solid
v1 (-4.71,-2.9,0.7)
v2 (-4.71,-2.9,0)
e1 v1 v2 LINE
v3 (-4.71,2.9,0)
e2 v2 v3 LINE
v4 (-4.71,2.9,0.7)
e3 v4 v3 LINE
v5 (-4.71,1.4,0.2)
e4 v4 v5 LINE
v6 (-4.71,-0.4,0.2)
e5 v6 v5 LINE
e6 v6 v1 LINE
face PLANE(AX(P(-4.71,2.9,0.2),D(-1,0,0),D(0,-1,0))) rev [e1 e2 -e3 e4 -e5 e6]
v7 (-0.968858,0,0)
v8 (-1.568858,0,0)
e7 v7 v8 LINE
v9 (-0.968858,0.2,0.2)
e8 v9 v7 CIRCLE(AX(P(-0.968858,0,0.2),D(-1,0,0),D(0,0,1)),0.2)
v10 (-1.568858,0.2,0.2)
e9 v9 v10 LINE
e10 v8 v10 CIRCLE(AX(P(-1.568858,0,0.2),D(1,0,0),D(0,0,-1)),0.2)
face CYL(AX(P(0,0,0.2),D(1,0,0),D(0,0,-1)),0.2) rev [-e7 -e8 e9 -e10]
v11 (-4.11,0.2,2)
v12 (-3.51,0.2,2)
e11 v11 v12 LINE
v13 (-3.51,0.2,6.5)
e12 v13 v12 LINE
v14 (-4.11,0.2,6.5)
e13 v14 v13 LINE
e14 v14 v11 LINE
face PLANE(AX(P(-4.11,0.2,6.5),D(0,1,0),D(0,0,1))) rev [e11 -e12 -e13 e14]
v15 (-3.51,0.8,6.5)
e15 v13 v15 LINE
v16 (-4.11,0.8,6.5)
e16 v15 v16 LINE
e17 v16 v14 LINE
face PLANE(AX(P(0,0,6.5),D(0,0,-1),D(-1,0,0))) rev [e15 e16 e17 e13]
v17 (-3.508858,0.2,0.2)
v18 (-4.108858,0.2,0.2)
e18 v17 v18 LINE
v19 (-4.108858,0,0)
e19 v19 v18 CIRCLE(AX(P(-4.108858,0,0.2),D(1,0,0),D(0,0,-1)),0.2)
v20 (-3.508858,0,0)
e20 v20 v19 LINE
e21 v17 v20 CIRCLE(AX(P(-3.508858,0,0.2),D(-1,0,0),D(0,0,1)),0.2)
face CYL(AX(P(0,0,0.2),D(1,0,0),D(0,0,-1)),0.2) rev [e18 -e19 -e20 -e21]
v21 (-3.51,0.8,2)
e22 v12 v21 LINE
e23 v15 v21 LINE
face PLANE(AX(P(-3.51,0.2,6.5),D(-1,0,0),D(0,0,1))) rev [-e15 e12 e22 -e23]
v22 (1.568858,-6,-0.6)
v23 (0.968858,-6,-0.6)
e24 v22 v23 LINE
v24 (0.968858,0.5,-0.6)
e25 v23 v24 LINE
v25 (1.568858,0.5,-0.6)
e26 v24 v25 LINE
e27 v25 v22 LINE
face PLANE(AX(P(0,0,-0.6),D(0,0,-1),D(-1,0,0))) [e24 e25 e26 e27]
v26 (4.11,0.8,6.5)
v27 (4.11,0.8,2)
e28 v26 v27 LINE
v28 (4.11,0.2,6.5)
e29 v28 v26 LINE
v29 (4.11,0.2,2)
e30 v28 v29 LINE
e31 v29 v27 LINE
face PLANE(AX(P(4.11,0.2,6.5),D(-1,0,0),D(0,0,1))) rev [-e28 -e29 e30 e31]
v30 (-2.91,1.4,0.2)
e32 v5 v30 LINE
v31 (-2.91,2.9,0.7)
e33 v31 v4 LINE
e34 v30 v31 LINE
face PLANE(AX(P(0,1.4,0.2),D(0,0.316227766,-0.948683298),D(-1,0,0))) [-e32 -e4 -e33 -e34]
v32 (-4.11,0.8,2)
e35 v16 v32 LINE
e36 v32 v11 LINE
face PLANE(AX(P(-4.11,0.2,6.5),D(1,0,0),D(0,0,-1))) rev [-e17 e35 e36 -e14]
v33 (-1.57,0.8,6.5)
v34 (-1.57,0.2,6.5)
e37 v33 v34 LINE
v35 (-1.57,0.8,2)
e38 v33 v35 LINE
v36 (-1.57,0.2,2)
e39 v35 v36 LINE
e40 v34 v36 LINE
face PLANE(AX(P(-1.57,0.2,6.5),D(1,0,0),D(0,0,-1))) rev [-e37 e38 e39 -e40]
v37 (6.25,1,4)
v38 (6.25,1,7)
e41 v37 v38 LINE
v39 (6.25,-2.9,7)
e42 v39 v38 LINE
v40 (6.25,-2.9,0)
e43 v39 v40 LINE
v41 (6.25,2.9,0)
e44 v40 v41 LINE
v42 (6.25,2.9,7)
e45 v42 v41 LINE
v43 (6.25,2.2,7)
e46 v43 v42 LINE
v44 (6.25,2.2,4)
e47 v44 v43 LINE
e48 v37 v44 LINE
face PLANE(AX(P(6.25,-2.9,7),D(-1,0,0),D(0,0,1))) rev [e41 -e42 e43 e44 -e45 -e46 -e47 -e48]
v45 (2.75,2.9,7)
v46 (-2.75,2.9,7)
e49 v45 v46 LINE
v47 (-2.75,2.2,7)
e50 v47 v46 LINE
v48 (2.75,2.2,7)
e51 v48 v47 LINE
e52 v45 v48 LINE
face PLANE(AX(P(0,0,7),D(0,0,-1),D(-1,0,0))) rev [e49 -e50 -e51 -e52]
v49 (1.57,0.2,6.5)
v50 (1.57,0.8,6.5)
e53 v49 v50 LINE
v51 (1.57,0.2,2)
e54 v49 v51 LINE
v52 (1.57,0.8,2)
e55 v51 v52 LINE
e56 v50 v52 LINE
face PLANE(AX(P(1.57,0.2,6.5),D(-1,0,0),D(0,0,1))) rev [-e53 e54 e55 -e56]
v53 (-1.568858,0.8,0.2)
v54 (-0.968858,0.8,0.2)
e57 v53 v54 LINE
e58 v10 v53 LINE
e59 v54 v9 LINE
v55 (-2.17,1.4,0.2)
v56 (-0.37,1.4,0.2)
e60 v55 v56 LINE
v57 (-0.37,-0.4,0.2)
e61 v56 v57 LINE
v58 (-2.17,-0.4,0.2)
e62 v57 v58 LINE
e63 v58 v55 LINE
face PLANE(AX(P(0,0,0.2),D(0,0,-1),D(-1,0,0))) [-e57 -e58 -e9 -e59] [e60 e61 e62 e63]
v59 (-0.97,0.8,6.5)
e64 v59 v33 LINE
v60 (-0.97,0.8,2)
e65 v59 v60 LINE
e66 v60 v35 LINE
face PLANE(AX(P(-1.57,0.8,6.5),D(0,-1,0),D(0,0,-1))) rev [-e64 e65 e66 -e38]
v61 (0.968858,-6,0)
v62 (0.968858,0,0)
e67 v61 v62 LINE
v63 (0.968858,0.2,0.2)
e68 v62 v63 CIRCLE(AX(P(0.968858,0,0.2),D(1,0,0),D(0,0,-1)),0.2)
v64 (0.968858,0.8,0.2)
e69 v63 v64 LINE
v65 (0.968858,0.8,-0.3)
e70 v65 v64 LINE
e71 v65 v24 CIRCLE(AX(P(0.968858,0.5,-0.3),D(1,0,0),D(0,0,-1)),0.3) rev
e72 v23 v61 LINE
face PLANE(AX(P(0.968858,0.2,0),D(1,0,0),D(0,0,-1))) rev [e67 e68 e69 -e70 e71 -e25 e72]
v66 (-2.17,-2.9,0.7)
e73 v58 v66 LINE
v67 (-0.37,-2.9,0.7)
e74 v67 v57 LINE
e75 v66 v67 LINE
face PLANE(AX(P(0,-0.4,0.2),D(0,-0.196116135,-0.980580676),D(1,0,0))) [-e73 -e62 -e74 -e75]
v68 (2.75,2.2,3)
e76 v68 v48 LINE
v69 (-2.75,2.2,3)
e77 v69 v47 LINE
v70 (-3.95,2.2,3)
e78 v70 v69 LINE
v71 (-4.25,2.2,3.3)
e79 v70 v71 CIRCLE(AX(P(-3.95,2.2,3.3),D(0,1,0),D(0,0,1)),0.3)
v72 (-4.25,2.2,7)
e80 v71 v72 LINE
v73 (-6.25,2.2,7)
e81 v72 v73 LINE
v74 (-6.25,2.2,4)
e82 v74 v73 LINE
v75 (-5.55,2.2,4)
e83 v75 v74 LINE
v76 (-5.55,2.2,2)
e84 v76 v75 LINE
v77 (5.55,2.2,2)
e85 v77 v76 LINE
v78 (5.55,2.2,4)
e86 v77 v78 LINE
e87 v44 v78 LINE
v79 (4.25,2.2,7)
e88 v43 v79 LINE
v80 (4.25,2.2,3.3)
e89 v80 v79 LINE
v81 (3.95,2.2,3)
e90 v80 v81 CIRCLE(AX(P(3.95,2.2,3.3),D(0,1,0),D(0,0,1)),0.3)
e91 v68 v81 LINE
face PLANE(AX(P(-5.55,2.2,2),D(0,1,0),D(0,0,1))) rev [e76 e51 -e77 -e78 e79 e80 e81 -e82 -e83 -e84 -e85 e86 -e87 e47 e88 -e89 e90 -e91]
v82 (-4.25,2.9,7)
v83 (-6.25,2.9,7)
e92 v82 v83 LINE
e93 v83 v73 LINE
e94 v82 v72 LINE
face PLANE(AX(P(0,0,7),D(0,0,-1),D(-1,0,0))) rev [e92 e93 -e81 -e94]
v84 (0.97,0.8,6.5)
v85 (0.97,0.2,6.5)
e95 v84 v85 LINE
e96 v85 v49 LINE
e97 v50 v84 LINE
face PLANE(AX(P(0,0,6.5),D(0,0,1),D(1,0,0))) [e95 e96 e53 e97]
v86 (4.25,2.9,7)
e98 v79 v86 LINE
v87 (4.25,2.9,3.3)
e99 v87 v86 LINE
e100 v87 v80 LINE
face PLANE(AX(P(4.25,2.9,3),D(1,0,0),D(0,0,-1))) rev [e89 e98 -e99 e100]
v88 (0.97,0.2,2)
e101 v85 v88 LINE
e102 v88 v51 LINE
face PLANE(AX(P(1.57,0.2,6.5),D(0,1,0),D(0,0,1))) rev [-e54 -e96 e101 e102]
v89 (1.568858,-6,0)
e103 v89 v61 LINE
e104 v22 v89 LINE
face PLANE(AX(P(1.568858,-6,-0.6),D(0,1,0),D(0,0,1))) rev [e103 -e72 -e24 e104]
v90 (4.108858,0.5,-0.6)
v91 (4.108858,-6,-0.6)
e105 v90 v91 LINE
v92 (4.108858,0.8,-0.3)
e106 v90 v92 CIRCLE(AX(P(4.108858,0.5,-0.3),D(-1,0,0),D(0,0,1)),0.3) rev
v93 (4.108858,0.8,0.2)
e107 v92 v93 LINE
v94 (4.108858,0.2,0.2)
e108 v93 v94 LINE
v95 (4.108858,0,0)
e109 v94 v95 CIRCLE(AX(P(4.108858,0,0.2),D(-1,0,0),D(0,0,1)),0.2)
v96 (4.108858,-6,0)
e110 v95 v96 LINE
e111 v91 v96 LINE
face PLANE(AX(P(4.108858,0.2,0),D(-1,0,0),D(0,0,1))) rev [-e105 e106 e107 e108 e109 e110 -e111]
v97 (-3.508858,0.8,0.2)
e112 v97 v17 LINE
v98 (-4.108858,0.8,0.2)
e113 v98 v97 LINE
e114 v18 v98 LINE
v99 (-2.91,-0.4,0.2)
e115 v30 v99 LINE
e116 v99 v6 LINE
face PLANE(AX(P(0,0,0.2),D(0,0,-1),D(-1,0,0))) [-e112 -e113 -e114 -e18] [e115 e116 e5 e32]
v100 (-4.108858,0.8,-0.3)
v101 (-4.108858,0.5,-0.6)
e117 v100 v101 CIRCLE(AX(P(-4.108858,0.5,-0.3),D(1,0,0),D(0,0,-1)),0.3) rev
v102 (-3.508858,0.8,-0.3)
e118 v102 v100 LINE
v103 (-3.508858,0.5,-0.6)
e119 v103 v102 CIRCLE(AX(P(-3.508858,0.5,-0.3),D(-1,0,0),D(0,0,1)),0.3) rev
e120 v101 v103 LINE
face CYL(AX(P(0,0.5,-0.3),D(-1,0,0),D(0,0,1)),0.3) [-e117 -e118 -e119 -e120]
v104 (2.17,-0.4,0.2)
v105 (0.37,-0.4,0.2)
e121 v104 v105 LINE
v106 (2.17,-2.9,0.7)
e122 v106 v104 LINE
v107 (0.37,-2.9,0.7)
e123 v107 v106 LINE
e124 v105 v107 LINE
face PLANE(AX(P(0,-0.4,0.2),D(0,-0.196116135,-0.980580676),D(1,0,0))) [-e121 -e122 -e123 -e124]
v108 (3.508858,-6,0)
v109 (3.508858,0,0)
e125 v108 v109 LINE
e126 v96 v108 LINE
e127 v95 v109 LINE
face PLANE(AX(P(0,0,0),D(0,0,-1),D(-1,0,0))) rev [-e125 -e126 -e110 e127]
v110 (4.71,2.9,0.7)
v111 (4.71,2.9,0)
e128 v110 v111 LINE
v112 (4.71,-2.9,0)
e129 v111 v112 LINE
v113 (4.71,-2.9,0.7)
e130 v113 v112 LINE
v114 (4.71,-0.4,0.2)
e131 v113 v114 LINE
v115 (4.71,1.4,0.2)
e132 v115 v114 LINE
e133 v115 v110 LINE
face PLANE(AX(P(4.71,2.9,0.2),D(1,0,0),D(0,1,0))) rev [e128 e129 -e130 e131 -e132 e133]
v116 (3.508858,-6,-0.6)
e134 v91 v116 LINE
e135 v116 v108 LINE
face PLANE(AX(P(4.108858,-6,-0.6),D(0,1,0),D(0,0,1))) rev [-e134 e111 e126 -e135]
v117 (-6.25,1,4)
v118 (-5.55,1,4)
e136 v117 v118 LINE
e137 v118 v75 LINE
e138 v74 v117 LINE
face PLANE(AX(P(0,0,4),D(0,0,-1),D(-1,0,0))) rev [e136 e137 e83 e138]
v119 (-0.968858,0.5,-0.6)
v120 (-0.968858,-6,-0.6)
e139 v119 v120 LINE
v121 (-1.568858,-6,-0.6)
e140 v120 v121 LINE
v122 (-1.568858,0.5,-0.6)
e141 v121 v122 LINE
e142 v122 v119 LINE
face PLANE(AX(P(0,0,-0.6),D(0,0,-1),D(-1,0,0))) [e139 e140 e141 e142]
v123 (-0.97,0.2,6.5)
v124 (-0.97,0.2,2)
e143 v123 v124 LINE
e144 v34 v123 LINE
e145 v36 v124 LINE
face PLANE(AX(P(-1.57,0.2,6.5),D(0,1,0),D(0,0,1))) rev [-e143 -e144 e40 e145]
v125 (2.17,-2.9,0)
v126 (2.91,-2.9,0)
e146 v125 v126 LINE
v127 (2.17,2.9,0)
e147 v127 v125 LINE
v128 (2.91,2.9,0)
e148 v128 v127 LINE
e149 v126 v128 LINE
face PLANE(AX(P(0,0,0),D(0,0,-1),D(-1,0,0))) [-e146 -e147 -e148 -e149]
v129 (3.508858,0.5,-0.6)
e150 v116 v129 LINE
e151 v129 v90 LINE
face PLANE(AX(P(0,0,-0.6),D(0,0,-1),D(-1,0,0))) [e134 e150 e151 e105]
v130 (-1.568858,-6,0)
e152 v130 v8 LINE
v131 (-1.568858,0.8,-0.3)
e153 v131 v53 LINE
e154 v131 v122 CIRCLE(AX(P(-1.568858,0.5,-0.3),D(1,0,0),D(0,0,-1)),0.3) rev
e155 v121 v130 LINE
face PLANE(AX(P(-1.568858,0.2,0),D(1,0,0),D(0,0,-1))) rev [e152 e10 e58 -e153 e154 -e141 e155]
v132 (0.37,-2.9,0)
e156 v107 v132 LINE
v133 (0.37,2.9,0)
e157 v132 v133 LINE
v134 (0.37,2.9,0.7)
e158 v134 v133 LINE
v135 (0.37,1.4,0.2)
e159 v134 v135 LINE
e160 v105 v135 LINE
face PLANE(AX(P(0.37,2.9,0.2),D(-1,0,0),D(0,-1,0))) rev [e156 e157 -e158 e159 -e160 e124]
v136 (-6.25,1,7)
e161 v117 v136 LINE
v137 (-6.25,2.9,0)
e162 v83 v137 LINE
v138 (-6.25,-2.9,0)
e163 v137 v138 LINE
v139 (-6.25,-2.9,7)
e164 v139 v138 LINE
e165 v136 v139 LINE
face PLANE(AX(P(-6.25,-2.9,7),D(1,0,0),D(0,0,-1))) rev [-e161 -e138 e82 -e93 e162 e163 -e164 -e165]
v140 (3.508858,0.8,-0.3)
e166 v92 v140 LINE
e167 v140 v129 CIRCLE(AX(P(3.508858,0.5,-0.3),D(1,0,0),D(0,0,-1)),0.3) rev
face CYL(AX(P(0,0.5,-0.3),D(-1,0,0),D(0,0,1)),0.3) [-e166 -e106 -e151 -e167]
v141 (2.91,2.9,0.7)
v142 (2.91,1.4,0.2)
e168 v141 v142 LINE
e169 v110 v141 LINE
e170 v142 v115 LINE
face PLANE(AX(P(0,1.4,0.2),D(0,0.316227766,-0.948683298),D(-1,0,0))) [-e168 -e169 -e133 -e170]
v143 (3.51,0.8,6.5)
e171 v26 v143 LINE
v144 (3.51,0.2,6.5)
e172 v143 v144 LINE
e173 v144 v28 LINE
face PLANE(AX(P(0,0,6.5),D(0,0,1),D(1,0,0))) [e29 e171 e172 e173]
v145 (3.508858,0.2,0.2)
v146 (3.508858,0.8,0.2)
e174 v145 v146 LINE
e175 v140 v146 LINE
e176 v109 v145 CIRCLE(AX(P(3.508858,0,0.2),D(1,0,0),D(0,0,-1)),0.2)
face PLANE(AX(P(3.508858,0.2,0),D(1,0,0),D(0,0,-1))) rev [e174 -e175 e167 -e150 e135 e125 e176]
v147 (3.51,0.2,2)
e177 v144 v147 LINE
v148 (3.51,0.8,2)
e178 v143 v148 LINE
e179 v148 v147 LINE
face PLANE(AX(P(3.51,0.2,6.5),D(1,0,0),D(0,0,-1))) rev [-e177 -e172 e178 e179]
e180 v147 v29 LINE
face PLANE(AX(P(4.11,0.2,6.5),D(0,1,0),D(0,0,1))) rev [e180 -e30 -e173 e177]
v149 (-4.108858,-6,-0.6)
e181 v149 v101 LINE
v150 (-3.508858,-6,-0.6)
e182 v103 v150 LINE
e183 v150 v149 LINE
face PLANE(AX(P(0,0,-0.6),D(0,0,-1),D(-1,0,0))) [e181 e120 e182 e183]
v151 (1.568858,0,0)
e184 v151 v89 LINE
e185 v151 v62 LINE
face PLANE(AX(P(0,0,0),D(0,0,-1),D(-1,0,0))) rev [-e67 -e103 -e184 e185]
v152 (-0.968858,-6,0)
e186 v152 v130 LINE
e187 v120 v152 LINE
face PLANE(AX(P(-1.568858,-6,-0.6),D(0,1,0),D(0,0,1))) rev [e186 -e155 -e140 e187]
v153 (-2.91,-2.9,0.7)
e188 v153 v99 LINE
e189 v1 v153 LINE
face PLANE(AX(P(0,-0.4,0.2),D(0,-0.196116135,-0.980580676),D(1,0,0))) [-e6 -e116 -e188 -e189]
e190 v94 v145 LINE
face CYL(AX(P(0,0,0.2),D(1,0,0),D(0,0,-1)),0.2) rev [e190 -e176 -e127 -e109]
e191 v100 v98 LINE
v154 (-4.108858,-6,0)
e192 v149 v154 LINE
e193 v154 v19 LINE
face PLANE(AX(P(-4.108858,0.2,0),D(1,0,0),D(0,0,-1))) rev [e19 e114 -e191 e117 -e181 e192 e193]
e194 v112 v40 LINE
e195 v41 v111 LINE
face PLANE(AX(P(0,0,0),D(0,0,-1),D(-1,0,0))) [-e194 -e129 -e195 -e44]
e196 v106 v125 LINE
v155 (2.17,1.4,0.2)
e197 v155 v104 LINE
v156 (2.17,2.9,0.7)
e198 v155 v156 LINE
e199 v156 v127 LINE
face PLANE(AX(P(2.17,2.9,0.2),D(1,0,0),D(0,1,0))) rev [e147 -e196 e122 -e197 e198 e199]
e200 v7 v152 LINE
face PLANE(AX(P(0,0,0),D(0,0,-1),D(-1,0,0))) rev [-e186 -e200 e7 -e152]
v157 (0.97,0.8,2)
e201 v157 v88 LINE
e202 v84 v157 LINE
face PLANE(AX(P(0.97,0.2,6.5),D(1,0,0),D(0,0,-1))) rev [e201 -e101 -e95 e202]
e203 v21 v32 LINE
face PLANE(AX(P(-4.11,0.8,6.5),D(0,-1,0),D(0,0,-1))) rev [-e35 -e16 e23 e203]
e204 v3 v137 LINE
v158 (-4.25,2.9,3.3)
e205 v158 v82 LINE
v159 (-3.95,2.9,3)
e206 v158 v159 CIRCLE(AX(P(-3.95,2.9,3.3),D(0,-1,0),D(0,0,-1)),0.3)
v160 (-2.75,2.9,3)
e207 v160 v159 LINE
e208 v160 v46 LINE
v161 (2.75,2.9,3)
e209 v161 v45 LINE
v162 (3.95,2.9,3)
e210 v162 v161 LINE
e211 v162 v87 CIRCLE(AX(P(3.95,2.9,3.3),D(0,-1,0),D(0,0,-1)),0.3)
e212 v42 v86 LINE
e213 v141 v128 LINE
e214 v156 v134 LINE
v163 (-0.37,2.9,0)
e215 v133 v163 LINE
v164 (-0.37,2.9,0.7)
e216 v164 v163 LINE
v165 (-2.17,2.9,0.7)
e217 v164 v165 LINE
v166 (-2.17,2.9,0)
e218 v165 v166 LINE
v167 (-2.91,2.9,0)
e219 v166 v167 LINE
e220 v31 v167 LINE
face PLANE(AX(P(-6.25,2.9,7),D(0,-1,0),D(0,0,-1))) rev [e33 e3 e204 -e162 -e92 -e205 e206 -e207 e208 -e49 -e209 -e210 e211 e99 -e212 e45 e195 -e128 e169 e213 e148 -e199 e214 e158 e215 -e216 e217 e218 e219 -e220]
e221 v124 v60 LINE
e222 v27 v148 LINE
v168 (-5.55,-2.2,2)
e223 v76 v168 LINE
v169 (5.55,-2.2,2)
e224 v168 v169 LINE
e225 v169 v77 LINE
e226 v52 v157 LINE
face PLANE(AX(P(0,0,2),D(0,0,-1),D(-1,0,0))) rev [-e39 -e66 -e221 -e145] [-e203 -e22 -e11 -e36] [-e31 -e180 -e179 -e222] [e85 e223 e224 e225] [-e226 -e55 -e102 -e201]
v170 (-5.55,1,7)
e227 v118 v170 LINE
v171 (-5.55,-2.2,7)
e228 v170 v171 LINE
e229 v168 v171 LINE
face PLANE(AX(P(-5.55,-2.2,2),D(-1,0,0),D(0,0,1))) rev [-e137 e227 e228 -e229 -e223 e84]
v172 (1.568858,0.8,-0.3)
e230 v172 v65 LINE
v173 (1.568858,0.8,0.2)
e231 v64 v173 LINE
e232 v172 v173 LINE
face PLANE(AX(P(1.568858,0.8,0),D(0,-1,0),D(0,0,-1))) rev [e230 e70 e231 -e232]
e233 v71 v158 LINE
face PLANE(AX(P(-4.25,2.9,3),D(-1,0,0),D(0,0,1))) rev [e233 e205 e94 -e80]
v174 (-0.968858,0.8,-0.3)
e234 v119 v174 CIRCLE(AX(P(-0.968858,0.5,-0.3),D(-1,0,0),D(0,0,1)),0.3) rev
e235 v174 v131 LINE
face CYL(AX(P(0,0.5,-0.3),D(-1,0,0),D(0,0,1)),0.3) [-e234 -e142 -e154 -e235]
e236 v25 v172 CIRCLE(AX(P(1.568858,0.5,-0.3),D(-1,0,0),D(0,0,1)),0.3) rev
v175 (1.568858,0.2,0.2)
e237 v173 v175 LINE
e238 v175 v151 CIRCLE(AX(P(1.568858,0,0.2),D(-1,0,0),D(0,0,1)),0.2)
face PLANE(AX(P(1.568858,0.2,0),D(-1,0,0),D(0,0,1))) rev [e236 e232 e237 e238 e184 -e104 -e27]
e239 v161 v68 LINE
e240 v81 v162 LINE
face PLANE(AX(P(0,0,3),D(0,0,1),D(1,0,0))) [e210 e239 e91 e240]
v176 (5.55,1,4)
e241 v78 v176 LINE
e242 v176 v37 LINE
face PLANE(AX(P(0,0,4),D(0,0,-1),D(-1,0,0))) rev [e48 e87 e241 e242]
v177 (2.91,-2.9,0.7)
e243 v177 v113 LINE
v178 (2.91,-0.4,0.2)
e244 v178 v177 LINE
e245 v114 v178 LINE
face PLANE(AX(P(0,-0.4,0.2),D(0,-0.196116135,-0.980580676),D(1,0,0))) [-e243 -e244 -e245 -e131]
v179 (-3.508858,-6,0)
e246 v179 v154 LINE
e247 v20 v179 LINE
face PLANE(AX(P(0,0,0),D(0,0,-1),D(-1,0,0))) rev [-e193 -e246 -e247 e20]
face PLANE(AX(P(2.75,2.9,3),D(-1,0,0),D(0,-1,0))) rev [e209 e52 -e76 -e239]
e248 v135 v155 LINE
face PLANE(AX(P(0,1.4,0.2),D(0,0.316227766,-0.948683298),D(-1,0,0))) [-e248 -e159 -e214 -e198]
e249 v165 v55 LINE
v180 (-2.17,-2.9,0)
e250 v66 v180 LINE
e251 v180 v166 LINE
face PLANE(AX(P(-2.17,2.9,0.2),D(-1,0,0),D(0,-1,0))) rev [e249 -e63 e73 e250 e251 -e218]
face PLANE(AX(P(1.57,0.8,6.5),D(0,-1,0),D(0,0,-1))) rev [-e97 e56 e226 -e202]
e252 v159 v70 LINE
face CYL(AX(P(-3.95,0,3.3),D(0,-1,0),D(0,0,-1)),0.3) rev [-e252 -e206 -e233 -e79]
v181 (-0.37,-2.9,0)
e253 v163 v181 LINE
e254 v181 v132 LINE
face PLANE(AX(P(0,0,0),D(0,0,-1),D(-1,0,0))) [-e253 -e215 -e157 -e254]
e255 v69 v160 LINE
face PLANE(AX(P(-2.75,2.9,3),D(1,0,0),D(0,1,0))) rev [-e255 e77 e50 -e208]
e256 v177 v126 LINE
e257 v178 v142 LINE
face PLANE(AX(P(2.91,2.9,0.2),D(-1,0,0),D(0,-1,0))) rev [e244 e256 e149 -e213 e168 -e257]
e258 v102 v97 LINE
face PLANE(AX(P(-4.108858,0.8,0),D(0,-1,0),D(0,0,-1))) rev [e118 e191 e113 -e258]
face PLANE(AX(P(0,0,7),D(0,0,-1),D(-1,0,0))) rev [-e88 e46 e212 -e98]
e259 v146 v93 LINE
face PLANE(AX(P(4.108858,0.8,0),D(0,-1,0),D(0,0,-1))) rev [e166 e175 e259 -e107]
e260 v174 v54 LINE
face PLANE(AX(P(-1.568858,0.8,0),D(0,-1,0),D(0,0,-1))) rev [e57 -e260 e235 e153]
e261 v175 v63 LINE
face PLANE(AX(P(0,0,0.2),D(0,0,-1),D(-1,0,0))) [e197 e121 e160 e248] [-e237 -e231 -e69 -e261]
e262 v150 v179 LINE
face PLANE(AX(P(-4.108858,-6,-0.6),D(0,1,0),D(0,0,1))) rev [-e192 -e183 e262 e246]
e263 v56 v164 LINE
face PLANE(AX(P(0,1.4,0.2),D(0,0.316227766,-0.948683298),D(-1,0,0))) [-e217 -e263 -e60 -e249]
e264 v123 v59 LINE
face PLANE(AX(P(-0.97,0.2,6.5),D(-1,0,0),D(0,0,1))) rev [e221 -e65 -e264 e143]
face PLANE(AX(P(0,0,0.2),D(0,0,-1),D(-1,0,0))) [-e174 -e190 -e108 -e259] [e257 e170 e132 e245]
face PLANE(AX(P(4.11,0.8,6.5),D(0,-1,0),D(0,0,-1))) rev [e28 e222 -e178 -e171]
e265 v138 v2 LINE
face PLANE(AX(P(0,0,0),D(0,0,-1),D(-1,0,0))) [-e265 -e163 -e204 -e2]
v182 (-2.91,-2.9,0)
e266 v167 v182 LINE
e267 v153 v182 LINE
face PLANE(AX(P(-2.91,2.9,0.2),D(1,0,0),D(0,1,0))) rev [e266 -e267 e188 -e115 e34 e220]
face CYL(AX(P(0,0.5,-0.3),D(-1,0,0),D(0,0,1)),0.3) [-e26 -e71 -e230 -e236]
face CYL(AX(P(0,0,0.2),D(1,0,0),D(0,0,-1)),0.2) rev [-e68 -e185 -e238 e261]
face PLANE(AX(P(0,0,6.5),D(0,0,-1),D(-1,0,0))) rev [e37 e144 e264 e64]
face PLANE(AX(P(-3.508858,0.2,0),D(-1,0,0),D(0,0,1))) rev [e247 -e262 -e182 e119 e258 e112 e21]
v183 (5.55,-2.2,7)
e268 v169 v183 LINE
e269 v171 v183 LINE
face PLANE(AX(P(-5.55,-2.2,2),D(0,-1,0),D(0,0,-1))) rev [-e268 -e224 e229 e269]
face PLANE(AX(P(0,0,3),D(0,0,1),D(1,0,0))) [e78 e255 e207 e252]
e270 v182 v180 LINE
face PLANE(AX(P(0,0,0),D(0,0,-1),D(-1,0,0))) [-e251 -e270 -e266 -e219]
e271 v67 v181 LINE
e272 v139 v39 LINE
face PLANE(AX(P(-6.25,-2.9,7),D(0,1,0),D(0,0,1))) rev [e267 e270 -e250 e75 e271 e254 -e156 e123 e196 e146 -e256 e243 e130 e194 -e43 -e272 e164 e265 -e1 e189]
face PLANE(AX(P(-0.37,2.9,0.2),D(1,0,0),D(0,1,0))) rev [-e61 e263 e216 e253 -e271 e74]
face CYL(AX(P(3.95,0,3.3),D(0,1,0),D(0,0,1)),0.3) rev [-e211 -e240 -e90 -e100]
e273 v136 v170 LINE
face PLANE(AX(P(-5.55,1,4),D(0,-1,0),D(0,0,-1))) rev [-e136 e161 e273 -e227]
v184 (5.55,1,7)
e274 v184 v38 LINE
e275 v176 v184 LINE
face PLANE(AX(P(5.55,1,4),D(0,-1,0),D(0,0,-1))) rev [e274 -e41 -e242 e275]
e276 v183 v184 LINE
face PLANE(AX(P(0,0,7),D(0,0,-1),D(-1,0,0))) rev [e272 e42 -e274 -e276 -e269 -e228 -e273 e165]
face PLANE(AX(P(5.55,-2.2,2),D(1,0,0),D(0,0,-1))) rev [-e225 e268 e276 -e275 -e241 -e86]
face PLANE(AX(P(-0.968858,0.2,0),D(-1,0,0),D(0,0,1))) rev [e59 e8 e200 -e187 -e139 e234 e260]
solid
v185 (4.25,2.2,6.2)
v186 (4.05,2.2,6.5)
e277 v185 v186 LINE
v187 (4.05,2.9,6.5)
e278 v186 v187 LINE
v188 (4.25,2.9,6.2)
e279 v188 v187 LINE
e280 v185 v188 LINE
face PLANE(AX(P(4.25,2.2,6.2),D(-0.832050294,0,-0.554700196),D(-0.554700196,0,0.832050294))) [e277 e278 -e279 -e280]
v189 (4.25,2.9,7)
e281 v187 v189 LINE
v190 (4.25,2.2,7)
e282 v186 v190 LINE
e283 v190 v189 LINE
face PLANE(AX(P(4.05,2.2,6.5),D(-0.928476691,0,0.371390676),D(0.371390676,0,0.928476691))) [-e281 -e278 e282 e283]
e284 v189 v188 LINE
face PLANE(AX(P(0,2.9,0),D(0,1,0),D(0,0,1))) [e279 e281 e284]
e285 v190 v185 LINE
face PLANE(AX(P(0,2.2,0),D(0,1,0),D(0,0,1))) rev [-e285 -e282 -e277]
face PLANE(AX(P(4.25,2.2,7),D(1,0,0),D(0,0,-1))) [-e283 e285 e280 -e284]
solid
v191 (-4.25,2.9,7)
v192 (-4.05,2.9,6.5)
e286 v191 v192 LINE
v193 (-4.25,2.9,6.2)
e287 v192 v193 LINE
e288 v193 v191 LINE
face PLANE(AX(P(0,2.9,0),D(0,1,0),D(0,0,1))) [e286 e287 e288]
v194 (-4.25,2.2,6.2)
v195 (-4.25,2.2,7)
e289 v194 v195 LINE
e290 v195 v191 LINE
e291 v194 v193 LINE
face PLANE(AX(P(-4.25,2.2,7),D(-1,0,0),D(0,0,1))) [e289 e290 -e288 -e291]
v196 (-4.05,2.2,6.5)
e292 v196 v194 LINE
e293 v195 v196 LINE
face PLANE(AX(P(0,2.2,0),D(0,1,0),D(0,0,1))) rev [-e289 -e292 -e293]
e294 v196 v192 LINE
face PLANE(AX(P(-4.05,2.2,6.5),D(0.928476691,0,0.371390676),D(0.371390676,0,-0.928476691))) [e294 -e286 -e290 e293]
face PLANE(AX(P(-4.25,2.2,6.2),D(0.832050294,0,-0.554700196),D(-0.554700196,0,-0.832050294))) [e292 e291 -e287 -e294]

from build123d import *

# Parameters (mm, degrees)
SKETCH_1_W          = 12.5
SKETCH_1_H          = 5.8
EXTRUDE_1_DEPTH     = 7
SKETCH_2_W          = 11.1
SKETCH_2_H          = 4.4
CUT_EXTRUDE_1_DEPTH = 5
SKETCH_3_W          = 0.7
SKETCH_3_H          = 1.2
CUT_EXTRUDE_2_DEPTH = 3
SKETCH_4_W          = 1.5
SKETCH_4_H          = 0.7
CUT_EXTRUDE_3_DEPTH = 4
FILLET_1_R          = 0.3
EXTRUDE_2_DEPTH     = 0.7
EXTRUDE_2_2_DEPTH   = 0.7
SKETCH_6_W          = 0.6
SKETCH_6_H          = 0.6
EXTRUDE_3_DEPTH     = 4.5
SKETCH_7_W          = 1.8
SKETCH_7_H          = 5.8
CUT_EXTRUDE_4_DEPTH = 0.2
SKETCH_8_W          = 0.6
SKETCH_8_H          = 0.6
EXTRUDE_4_DEPTH     = 0.2
SKETCH_9_W          = 0.6
SKETCH_9_H          = 6.8
EXTRUDE_5_DEPTH     = 0.6
FILLET_2_R          = 0.3
FILLET_3_R          = 0.2
CHAMFER_1_SIZE      = 0.5
CHAMFER_1_SIZE2     = 1.5
CHAMFER_2_SIZE      = 0.5
CHAMFER_2_SIZE2     = 2.5


with BuildPart() as part:
    # 草图1 → 凸台-拉伸1 (new body)
    with BuildSketch(Plane.XY):
        Rectangle(SKETCH_1_W, SKETCH_1_H)
    extrude(amount=EXTRUDE_1_DEPTH)

    # 草图2 → 切除-拉伸1 (cut)
    with BuildSketch(Plane.XY.offset(7)):
        Rectangle(SKETCH_2_W, SKETCH_2_H)
    extrude(amount=-CUT_EXTRUDE_1_DEPTH, mode=Mode.SUBTRACT)

    # 草图3 → 切除-拉伸2 (cut)
    with BuildSketch(Plane.XY.offset(7)):
        with Locations((-5.9, 1.6)):
            Rectangle(SKETCH_3_W, SKETCH_3_H)
        with Locations((5.9, 1.6)):
            Rectangle(SKETCH_3_W, SKETCH_3_H)
    extrude(amount=-CUT_EXTRUDE_2_DEPTH, mode=Mode.SUBTRACT)

    # 草图4 → 切除-拉伸3 (cut)
    with BuildSketch(Plane.XY.offset(7)):
        with Locations((-3.5, 2.55)):
            Rectangle(SKETCH_4_W, SKETCH_4_H)
        with Locations((3.5, 2.55)):
            Rectangle(SKETCH_4_W, SKETCH_4_H)
    extrude(amount=-CUT_EXTRUDE_3_DEPTH, mode=Mode.SUBTRACT)

    # 圆角1
    fillet_1_edges = [part.edges().sort_by_distance(p)[0] for p in [
        (-4.25, 2.55, 3),
        (4.25, 2.55, 3),
    ]]
    fillet(fillet_1_edges, radius=FILLET_1_R)

    # 草图6 → 凸台-拉伸3 (add)
    with BuildSketch(Plane.XY.offset(2)):
        with Locations((-3.81, 0.5)):
            Rectangle(SKETCH_6_W, SKETCH_6_H)
        with Locations((-1.27, 0.5)):
            Rectangle(SKETCH_6_W, SKETCH_6_H)
        with Locations((1.27, 0.5)):
            Rectangle(SKETCH_6_W, SKETCH_6_H)
        with Locations((3.81, 0.5)):
            Rectangle(SKETCH_6_W, SKETCH_6_H)
    extrude(amount=EXTRUDE_3_DEPTH)

    # 草图7 → 切除-拉伸4 (cut)
    with BuildSketch(Plane(origin=(0, 0, 0), x_dir=(-1, 0, 0), z_dir=(0, 0, -1))):
        with Locations((-3.81, 0)):
            Rectangle(SKETCH_7_W, SKETCH_7_H)
        with Locations((-1.27, 0)):
            Rectangle(SKETCH_7_W, SKETCH_7_H)
        with Locations((1.27, 0)):
            Rectangle(SKETCH_7_W, SKETCH_7_H)
        with Locations((3.81, 0)):
            Rectangle(SKETCH_7_W, SKETCH_7_H)
    extrude(amount=-CUT_EXTRUDE_4_DEPTH, mode=Mode.SUBTRACT)

    # 草图8 → 凸台-拉伸4 (add)
    with BuildSketch(Plane(origin=(0, 0, 0.2), x_dir=(-1, 0, 0), z_dir=(0, 0, -1))):
        with Locations((-3.808858408, 0.5)):
            Rectangle(SKETCH_8_W, SKETCH_8_H)
        with Locations((-1.268858408, 0.5)):
            Rectangle(SKETCH_8_W, SKETCH_8_H)
        with Locations((1.268858408, 0.5)):
            Rectangle(SKETCH_8_W, SKETCH_8_H)
        with Locations((3.808858408, 0.5)):
            Rectangle(SKETCH_8_W, SKETCH_8_H)
    extrude(amount=EXTRUDE_4_DEPTH)

    # 草图9 → 凸台-拉伸5 (add)
    with BuildSketch(Plane(origin=(0, 0, 0), x_dir=(-1, 0, 0), z_dir=(0, 0, -1))):
        with Locations((-3.808858408, -2.6)):
            Rectangle(SKETCH_9_W, SKETCH_9_H)
        with Locations((-1.268858408, -2.6)):
            Rectangle(SKETCH_9_W, SKETCH_9_H)
        with Locations((1.268858408, -2.6)):
            Rectangle(SKETCH_9_W, SKETCH_9_H)
        with Locations((3.808858408, -2.6)):
            Rectangle(SKETCH_9_W, SKETCH_9_H)
    extrude(amount=EXTRUDE_5_DEPTH)

    # 圆角2
    fillet_2_edges = [part.edges().sort_by_distance(p)[0] for p in [
        (3.808858408, 0.8, -0.6),
        (1.268858408, 0.8, -0.6),
        (-1.268858408, 0.8, -0.6),
        (-3.808858408, 0.8, -0.6),
    ]]
    fillet(fillet_2_edges, radius=FILLET_2_R)

    # 圆角3
    fillet_3_edges = [part.edges().sort_by_distance(p)[0] for p in [
        (-3.808858408, 0.2, 0),
        (-1.268858408, 0.2, 0),
        (1.268858408, 0.2, 0),
        (3.808858408, 0.2, 0),
    ]]
    fillet(fillet_3_edges, radius=FILLET_3_R - 0.0001)  # a hair under: the kernel refuses the full size

    # 倒角1
    chamfer_1_edges = [part.edges().sort_by_distance(p)[0] for p in [
        (3.81, 2.9, 0.2),
        (1.27, 2.9, 0.2),
        (-1.27, 2.9, 0.2),
        (-3.81, 2.9, 0.2),
    ]]
    chamfer_1_side = [part.faces().sort_by_distance(p)[0] for p in [
        (0, 2.9, 3.322928899),
    ]]
    chamfer(chamfer_1_edges, length=CHAMFER_1_SIZE, length2=CHAMFER_1_SIZE2, reference=chamfer_1_side[0])

    # 倒角2
    chamfer_2_edges = [part.edges().sort_by_distance(p)[0] for p in [
        (3.81, -2.9, 0.2),
        (1.27, -2.9, 0.2),
        (-1.27, -2.9, 0.2),
        (-3.81, -2.9, 0.2),
    ]]
    chamfer_2_side = [part.faces().sort_by_distance(p)[0] for p in [
        (0, -2.9, 3.556890541),
    ]]
    chamfer(chamfer_2_edges, length=CHAMFER_2_SIZE, length2=CHAMFER_2_SIZE2, reference=chamfer_2_side[0])


with BuildPart() as body_2:
    # 草图5 → 凸台-拉伸2 (new body)
    with BuildSketch(Plane(origin=(0, 2.9, 0), x_dir=(1, 0, 0), z_dir=(0, 1, 0))):
        Polygon((-4.25, -7), (-4.25, -6.2), (-4.05, -6.5), align=None)
    extrude(amount=-EXTRUDE_2_DEPTH)


with BuildPart() as body_3:
    # 草图5 → Extrude 2 2 (new body)
    with BuildSketch(Plane(origin=(0, 2.9, 0), x_dir=(1, 0, 0), z_dir=(0, 1, 0))):
        Polygon((4.05, -6.5), (4.25, -7), (4.25, -6.2), align=None)
    extrude(amount=-EXTRUDE_2_2_DEPTH)


solid = Compound([part.part, body_2.part, body_3.part])
